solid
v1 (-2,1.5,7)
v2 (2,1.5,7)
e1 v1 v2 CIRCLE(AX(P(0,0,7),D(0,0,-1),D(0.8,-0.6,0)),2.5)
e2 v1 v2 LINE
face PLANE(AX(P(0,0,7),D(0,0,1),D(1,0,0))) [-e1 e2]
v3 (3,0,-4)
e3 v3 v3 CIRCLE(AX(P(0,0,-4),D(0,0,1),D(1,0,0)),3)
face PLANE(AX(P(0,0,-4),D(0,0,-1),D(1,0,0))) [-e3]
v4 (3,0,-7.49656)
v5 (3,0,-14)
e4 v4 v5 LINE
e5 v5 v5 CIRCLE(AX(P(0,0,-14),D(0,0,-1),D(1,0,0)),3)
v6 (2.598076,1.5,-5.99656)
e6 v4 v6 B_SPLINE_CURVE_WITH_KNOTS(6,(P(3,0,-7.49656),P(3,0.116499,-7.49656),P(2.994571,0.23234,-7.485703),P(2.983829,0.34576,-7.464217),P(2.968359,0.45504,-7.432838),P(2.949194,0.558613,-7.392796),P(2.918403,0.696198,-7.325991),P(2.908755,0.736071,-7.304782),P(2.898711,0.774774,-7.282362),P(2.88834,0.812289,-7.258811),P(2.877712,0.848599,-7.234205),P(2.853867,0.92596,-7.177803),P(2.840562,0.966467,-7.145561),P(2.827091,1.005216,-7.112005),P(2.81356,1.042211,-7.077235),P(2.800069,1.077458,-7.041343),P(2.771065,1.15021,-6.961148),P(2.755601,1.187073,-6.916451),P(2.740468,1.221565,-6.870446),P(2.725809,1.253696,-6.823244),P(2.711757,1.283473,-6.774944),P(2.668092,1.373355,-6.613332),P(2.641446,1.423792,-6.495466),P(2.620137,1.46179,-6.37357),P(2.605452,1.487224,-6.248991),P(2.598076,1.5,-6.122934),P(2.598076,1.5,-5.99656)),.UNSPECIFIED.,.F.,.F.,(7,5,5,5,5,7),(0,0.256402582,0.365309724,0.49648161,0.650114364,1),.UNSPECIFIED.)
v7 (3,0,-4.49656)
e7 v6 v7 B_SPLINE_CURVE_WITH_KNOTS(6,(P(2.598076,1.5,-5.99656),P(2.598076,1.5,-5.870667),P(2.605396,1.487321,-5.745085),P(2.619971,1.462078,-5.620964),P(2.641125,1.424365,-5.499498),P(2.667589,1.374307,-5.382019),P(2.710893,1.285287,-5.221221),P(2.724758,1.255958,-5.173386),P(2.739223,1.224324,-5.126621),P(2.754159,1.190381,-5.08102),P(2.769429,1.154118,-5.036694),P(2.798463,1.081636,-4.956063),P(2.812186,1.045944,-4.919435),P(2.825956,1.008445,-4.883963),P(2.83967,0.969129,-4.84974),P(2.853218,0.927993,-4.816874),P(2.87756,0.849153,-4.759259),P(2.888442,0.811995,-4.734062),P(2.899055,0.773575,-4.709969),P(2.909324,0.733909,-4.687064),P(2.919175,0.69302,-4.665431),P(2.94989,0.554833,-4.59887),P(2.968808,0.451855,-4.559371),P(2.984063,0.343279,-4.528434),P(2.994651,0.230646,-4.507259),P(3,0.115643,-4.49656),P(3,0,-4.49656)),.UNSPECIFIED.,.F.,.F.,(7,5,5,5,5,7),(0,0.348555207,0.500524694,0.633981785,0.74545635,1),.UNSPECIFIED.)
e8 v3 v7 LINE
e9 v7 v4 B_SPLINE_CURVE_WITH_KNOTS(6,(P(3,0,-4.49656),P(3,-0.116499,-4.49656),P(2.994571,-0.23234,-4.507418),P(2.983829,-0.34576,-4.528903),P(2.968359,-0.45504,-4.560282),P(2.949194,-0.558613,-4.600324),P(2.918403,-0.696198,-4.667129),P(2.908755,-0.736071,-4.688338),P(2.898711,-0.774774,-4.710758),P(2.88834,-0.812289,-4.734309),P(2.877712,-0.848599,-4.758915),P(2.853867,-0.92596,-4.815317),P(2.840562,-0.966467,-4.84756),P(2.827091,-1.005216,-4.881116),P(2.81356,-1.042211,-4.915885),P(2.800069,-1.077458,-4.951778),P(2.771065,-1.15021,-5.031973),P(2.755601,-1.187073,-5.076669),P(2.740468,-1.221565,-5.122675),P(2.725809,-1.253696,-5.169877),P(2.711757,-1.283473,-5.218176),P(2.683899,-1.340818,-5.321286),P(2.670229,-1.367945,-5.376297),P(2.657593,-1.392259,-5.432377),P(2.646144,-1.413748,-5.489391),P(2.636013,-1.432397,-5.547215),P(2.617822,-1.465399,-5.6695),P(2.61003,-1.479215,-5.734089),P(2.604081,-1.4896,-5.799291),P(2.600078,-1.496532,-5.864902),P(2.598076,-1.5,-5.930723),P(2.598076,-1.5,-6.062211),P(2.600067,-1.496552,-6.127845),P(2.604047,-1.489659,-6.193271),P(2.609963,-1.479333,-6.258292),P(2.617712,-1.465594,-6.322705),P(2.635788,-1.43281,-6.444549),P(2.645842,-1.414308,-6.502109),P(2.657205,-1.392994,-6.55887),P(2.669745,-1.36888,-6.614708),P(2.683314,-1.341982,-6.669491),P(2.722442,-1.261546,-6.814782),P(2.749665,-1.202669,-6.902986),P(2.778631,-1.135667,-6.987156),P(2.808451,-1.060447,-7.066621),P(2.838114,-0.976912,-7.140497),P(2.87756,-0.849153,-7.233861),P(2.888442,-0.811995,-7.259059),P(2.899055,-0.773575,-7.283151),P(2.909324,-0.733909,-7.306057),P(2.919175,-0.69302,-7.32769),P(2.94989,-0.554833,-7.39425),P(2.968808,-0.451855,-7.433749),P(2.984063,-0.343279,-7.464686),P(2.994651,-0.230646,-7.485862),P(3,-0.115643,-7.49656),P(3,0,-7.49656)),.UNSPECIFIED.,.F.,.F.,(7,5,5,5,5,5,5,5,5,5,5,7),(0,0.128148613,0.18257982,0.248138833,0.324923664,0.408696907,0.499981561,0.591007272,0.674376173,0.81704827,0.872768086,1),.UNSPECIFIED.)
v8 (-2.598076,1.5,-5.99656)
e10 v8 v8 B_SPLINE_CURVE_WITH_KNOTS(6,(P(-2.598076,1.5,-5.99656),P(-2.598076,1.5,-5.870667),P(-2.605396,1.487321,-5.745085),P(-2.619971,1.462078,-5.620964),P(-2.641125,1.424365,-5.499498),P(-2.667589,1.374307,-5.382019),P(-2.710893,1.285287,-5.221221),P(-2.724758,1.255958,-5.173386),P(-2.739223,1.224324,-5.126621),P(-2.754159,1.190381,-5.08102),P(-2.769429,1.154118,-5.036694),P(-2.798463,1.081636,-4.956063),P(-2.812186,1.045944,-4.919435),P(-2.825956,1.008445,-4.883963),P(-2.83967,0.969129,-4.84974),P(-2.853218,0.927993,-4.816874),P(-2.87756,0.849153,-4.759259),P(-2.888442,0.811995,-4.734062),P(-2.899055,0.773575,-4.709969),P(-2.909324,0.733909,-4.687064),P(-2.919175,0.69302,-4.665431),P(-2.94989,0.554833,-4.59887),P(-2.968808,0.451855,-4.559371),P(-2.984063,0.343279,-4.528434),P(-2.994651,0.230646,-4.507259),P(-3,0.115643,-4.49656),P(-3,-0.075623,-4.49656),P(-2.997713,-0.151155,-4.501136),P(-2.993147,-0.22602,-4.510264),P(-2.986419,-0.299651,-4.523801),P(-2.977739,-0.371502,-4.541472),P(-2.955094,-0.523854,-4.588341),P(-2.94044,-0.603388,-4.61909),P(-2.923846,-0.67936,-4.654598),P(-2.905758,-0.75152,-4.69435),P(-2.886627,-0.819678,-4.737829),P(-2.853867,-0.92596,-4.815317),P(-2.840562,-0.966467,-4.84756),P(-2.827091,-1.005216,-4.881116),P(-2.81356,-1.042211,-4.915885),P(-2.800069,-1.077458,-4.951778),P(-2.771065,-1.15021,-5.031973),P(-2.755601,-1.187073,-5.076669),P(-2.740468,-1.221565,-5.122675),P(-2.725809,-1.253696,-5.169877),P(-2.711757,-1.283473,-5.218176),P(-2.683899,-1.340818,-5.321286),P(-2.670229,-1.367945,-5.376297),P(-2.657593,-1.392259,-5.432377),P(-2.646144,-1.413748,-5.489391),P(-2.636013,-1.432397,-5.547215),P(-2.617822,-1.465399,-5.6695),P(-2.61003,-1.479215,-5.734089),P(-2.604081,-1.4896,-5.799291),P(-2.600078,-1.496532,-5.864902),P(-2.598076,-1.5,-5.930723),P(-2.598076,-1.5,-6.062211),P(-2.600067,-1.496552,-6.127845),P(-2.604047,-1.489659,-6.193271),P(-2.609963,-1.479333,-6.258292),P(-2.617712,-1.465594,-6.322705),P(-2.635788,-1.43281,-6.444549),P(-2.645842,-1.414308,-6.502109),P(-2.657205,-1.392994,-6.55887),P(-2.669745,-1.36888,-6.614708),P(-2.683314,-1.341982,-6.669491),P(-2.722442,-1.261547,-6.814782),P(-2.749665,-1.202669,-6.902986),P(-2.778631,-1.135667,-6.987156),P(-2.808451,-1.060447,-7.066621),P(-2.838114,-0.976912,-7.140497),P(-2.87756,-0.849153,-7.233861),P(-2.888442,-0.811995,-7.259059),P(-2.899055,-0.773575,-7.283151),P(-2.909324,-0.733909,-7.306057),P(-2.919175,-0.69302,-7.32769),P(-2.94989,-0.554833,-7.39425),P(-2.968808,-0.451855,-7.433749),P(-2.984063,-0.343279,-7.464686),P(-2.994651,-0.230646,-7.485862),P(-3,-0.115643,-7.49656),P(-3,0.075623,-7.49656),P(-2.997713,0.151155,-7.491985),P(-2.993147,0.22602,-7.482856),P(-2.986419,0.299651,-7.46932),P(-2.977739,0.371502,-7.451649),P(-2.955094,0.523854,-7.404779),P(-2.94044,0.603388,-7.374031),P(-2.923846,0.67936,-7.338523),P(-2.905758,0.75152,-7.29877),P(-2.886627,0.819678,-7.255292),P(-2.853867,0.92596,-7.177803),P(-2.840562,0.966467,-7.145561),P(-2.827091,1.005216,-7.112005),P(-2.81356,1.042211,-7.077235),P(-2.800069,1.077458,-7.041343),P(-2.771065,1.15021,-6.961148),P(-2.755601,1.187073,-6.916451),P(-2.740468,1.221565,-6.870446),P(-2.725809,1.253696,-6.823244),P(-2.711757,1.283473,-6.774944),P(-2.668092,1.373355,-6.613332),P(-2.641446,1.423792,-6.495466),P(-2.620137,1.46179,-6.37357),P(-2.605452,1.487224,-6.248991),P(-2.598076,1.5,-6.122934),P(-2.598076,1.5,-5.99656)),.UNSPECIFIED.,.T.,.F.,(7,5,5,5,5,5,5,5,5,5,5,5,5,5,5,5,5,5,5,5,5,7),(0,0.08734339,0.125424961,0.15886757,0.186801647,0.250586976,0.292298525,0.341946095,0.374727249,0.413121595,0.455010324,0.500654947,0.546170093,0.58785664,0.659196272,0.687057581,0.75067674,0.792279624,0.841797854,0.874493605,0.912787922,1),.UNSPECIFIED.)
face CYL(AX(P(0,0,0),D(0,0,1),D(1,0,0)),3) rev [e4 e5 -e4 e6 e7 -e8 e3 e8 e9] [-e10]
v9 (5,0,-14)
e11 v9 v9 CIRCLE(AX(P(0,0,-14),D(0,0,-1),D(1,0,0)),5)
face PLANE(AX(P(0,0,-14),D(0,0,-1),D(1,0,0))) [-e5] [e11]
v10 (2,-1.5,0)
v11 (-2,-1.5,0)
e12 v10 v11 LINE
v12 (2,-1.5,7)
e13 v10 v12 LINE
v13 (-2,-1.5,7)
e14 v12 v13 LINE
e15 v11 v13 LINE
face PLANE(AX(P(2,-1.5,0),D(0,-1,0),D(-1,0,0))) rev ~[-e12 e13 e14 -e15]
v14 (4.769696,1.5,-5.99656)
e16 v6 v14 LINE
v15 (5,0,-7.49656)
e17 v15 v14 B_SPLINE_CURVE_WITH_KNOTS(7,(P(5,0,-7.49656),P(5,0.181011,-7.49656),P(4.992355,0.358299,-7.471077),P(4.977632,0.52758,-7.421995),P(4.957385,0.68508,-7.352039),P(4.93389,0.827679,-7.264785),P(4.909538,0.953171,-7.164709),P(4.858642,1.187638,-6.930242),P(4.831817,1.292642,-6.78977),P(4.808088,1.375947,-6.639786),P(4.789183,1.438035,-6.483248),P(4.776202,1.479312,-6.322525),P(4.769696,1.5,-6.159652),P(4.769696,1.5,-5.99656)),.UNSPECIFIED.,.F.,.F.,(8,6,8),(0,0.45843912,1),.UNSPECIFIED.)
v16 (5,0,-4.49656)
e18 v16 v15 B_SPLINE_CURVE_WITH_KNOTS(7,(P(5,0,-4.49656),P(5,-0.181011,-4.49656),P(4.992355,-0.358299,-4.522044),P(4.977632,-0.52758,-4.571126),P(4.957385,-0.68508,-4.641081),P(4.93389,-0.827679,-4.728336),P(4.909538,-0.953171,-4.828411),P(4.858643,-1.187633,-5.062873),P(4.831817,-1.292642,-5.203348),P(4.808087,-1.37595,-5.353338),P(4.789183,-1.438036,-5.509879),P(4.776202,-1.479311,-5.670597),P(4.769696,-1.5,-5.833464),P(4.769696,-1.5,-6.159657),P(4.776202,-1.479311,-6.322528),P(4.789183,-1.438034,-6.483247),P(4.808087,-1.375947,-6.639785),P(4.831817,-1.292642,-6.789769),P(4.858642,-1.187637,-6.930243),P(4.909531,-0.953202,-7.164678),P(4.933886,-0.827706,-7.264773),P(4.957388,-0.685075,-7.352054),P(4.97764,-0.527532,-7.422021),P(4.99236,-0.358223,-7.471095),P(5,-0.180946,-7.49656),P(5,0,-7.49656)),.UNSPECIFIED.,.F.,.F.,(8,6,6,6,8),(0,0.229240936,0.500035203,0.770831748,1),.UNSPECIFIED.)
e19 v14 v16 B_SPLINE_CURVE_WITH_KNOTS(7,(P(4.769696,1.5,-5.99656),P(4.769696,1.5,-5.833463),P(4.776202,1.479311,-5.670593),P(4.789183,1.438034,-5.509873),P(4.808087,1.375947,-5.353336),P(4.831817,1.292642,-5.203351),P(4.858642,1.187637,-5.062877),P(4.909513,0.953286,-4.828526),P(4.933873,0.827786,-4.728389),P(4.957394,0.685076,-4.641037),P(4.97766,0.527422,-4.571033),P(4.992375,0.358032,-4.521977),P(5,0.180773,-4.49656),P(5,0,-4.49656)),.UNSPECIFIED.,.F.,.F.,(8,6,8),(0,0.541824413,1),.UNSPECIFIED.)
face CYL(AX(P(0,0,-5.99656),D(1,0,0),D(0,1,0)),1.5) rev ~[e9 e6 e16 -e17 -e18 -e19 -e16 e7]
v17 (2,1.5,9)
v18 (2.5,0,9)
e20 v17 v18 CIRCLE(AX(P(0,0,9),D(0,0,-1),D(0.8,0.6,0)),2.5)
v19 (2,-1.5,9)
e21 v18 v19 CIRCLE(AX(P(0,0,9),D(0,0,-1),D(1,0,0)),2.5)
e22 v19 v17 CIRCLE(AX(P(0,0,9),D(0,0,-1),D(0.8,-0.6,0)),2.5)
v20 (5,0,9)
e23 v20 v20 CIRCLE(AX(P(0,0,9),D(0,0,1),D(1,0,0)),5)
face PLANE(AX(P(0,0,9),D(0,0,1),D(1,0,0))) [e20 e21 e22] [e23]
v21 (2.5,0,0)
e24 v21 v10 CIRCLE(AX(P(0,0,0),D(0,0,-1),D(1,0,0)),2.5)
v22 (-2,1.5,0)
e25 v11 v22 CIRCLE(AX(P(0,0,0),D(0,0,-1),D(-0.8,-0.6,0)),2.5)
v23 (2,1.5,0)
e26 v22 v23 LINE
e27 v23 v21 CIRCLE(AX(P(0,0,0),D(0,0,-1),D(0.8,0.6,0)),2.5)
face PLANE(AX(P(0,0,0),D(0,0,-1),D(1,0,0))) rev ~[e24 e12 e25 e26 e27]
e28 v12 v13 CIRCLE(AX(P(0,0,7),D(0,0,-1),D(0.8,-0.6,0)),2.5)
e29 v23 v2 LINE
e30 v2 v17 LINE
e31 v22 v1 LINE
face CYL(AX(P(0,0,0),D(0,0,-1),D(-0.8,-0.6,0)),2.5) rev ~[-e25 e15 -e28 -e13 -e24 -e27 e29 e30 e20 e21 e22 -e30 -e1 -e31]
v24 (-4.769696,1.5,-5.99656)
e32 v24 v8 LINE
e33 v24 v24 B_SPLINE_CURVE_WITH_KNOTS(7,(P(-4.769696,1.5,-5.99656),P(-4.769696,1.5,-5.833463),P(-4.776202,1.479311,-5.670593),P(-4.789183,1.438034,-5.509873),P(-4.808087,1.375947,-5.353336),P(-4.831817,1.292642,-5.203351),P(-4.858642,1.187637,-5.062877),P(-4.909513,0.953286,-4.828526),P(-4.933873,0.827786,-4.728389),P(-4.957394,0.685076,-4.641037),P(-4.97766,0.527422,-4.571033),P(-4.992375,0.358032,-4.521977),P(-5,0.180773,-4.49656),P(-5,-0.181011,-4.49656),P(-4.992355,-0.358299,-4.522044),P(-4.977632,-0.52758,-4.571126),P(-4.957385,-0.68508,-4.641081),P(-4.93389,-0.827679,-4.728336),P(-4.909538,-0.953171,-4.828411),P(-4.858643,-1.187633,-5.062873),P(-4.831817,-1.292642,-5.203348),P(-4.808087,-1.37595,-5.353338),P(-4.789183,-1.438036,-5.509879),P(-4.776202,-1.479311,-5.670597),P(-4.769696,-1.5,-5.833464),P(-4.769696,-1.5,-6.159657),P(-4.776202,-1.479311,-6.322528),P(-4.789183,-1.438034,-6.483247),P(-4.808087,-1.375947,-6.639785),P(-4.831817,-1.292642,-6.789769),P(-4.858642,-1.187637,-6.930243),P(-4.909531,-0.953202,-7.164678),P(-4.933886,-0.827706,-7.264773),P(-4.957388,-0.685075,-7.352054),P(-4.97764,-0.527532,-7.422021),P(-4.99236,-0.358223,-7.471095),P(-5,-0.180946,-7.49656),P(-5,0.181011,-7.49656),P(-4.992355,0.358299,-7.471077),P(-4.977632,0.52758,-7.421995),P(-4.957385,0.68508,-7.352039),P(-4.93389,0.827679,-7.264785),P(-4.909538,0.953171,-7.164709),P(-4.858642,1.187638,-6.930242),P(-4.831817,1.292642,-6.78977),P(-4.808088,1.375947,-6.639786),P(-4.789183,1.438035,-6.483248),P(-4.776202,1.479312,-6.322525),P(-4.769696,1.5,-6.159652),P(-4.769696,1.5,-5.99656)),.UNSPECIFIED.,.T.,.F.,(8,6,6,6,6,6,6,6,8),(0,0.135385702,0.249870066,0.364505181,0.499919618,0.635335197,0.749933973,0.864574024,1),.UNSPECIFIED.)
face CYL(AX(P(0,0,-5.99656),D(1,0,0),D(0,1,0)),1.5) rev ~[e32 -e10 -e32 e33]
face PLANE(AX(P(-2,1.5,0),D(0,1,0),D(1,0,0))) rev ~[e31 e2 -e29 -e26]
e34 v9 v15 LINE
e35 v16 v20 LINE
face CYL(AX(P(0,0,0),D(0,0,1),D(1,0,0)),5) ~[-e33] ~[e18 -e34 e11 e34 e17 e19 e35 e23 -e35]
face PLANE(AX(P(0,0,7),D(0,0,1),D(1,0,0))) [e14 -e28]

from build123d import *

# Parameters (mm, degrees)
F0_R     = 5
F1_DEPTH = 7
F2_DEPTH = 9
F3_R     = 5
F3_R_2   = 3
F4_DEPTH = 4
F5_DEPTH = 14
F6_R     = 1.5
F7_DEPTH = 12.5


with BuildPart() as f1:
    # F0 (on Top) → F1 (new body)
    with BuildSketch(Plane.XY):
        Circle(F0_R)
        with BuildLine():
            ThreePointArc((-2, 1.5), (0, 2.5), (2, 1.5))
            Line((2, 1.5), (3.6073317751, 1.5))
            Line((3.6073317751, 1.5), (3.6073317751, -1.5))
            Line((3.6073317751, -1.5), (2, -1.5))
            ThreePointArc((2, -1.5), (0, -2.5), (-2, -1.5))
            Line((-2, -1.5), (-3.6073317751, -1.5))
            Line((-3.6073317751, -1.5), (-3.6073317751, 1.5))
            Line((-3.6073317751, 1.5), (-2, 1.5))
        make_face(mode=Mode.SUBTRACT)
        with BuildLine():
            ThreePointArc((2, 1.5), (2.3717082451, 0.790569415), (2.5, 0))
            ThreePointArc((2.5, 0), (2.3717082451, -0.790569415), (2, -1.5))
            Line((2, -1.5), (3.6073317751, -1.5))
            Line((3.6073317751, -1.5), (3.6073317751, 1.5))
            Line((3.6073317751, 1.5), (2, 1.5))
        make_face()
        with BuildLine():
            Line((-2, 1.5), (2, 1.5))
            ThreePointArc((2, 1.5), (0, 2.5), (-2, 1.5))
        make_face()
        with BuildLine():
            ThreePointArc((-2, -1.5), (0, -2.5), (2, -1.5))
            Line((2, -1.5), (-2, -1.5))
        make_face()
        with BuildLine():
            ThreePointArc((-2, -1.5), (-2.5, 0), (-2, 1.5))
            Line((-2, 1.5), (-3.6073317751, 1.5))
            Line((-3.6073317751, 1.5), (-3.6073317751, -1.5))
            Line((-3.6073317751, -1.5), (-2, -1.5))
        make_face()
    extrude(amount=F1_DEPTH)

    # F0 (on Top) → F2 (join)
    with BuildSketch(Plane.XY):
        Circle(F0_R)
        with BuildLine():
            ThreePointArc((-2, 1.5), (0, 2.5), (2, 1.5))
            Line((2, 1.5), (3.6073317751, 1.5))
            Line((3.6073317751, 1.5), (3.6073317751, -1.5))
            Line((3.6073317751, -1.5), (2, -1.5))
            ThreePointArc((2, -1.5), (0, -2.5), (-2, -1.5))
            Line((-2, -1.5), (-3.6073317751, -1.5))
            Line((-3.6073317751, -1.5), (-3.6073317751, 1.5))
            Line((-3.6073317751, 1.5), (-2, 1.5))
        make_face(mode=Mode.SUBTRACT)
        with BuildLine():
            ThreePointArc((-2, -1.5), (-2.5, 0), (-2, 1.5))
            Line((-2, 1.5), (-3.6073317751, 1.5))
            Line((-3.6073317751, 1.5), (-3.6073317751, -1.5))
            Line((-3.6073317751, -1.5), (-2, -1.5))
        make_face()
        with BuildLine():
            ThreePointArc((2, 1.5), (2.3717082451, 0.790569415), (2.5, 0))
            ThreePointArc((2.5, 0), (2.3717082451, -0.790569415), (2, -1.5))
            Line((2, -1.5), (3.6073317751, -1.5))
            Line((3.6073317751, -1.5), (3.6073317751, 1.5))
            Line((3.6073317751, 1.5), (2, 1.5))
        make_face()
    extrude(amount=F2_DEPTH)

    # F3 (on face) → F4 (join)
    with BuildSketch(Plane(origin=(0, 0, 0), x_dir=(1, 0, 0), z_dir=(0, 0, -1))):
        Circle(F3_R)
        Circle(F3_R_2, mode=Mode.SUBTRACT)
        Circle(F3_R_2)
        with BuildLine():
            Line((2, -1.5), (-2, -1.5))
            ThreePointArc((-2, -1.5), (-2.5, 0), (-2, 1.5))
            Line((-2, 1.5), (2, 1.5))
            ThreePointArc((2, 1.5), (2.5, 0), (2, -1.5))
        make_face(mode=Mode.SUBTRACT)
        with BuildLine():
            ThreePointArc((-2, 1.5), (-2.5, 0), (-2, -1.5))
            Line((-2, -1.5), (2, -1.5))
            ThreePointArc((2, -1.5), (2.5, 0), (2, 1.5))
            Line((2, 1.5), (-2, 1.5))
        make_face()
    extrude(amount=F4_DEPTH)

    # F3 (on face) → F5 (join)
    with BuildSketch(Plane(origin=(0, 0, 0), x_dir=(1, 0, 0), z_dir=(0, 0, -1))):
        Circle(F3_R)
        Circle(F3_R_2, mode=Mode.SUBTRACT)
    extrude(amount=F5_DEPTH)

    # F6 (on Right) → F7 (cut, symmetric)
    with BuildSketch(Plane.YZ):
        with Locations((0, -5.9965602363)):
            Circle(F6_R)
    extrude(amount=F7_DEPTH, both=True, mode=Mode.SUBTRACT)


solid = f1.part
